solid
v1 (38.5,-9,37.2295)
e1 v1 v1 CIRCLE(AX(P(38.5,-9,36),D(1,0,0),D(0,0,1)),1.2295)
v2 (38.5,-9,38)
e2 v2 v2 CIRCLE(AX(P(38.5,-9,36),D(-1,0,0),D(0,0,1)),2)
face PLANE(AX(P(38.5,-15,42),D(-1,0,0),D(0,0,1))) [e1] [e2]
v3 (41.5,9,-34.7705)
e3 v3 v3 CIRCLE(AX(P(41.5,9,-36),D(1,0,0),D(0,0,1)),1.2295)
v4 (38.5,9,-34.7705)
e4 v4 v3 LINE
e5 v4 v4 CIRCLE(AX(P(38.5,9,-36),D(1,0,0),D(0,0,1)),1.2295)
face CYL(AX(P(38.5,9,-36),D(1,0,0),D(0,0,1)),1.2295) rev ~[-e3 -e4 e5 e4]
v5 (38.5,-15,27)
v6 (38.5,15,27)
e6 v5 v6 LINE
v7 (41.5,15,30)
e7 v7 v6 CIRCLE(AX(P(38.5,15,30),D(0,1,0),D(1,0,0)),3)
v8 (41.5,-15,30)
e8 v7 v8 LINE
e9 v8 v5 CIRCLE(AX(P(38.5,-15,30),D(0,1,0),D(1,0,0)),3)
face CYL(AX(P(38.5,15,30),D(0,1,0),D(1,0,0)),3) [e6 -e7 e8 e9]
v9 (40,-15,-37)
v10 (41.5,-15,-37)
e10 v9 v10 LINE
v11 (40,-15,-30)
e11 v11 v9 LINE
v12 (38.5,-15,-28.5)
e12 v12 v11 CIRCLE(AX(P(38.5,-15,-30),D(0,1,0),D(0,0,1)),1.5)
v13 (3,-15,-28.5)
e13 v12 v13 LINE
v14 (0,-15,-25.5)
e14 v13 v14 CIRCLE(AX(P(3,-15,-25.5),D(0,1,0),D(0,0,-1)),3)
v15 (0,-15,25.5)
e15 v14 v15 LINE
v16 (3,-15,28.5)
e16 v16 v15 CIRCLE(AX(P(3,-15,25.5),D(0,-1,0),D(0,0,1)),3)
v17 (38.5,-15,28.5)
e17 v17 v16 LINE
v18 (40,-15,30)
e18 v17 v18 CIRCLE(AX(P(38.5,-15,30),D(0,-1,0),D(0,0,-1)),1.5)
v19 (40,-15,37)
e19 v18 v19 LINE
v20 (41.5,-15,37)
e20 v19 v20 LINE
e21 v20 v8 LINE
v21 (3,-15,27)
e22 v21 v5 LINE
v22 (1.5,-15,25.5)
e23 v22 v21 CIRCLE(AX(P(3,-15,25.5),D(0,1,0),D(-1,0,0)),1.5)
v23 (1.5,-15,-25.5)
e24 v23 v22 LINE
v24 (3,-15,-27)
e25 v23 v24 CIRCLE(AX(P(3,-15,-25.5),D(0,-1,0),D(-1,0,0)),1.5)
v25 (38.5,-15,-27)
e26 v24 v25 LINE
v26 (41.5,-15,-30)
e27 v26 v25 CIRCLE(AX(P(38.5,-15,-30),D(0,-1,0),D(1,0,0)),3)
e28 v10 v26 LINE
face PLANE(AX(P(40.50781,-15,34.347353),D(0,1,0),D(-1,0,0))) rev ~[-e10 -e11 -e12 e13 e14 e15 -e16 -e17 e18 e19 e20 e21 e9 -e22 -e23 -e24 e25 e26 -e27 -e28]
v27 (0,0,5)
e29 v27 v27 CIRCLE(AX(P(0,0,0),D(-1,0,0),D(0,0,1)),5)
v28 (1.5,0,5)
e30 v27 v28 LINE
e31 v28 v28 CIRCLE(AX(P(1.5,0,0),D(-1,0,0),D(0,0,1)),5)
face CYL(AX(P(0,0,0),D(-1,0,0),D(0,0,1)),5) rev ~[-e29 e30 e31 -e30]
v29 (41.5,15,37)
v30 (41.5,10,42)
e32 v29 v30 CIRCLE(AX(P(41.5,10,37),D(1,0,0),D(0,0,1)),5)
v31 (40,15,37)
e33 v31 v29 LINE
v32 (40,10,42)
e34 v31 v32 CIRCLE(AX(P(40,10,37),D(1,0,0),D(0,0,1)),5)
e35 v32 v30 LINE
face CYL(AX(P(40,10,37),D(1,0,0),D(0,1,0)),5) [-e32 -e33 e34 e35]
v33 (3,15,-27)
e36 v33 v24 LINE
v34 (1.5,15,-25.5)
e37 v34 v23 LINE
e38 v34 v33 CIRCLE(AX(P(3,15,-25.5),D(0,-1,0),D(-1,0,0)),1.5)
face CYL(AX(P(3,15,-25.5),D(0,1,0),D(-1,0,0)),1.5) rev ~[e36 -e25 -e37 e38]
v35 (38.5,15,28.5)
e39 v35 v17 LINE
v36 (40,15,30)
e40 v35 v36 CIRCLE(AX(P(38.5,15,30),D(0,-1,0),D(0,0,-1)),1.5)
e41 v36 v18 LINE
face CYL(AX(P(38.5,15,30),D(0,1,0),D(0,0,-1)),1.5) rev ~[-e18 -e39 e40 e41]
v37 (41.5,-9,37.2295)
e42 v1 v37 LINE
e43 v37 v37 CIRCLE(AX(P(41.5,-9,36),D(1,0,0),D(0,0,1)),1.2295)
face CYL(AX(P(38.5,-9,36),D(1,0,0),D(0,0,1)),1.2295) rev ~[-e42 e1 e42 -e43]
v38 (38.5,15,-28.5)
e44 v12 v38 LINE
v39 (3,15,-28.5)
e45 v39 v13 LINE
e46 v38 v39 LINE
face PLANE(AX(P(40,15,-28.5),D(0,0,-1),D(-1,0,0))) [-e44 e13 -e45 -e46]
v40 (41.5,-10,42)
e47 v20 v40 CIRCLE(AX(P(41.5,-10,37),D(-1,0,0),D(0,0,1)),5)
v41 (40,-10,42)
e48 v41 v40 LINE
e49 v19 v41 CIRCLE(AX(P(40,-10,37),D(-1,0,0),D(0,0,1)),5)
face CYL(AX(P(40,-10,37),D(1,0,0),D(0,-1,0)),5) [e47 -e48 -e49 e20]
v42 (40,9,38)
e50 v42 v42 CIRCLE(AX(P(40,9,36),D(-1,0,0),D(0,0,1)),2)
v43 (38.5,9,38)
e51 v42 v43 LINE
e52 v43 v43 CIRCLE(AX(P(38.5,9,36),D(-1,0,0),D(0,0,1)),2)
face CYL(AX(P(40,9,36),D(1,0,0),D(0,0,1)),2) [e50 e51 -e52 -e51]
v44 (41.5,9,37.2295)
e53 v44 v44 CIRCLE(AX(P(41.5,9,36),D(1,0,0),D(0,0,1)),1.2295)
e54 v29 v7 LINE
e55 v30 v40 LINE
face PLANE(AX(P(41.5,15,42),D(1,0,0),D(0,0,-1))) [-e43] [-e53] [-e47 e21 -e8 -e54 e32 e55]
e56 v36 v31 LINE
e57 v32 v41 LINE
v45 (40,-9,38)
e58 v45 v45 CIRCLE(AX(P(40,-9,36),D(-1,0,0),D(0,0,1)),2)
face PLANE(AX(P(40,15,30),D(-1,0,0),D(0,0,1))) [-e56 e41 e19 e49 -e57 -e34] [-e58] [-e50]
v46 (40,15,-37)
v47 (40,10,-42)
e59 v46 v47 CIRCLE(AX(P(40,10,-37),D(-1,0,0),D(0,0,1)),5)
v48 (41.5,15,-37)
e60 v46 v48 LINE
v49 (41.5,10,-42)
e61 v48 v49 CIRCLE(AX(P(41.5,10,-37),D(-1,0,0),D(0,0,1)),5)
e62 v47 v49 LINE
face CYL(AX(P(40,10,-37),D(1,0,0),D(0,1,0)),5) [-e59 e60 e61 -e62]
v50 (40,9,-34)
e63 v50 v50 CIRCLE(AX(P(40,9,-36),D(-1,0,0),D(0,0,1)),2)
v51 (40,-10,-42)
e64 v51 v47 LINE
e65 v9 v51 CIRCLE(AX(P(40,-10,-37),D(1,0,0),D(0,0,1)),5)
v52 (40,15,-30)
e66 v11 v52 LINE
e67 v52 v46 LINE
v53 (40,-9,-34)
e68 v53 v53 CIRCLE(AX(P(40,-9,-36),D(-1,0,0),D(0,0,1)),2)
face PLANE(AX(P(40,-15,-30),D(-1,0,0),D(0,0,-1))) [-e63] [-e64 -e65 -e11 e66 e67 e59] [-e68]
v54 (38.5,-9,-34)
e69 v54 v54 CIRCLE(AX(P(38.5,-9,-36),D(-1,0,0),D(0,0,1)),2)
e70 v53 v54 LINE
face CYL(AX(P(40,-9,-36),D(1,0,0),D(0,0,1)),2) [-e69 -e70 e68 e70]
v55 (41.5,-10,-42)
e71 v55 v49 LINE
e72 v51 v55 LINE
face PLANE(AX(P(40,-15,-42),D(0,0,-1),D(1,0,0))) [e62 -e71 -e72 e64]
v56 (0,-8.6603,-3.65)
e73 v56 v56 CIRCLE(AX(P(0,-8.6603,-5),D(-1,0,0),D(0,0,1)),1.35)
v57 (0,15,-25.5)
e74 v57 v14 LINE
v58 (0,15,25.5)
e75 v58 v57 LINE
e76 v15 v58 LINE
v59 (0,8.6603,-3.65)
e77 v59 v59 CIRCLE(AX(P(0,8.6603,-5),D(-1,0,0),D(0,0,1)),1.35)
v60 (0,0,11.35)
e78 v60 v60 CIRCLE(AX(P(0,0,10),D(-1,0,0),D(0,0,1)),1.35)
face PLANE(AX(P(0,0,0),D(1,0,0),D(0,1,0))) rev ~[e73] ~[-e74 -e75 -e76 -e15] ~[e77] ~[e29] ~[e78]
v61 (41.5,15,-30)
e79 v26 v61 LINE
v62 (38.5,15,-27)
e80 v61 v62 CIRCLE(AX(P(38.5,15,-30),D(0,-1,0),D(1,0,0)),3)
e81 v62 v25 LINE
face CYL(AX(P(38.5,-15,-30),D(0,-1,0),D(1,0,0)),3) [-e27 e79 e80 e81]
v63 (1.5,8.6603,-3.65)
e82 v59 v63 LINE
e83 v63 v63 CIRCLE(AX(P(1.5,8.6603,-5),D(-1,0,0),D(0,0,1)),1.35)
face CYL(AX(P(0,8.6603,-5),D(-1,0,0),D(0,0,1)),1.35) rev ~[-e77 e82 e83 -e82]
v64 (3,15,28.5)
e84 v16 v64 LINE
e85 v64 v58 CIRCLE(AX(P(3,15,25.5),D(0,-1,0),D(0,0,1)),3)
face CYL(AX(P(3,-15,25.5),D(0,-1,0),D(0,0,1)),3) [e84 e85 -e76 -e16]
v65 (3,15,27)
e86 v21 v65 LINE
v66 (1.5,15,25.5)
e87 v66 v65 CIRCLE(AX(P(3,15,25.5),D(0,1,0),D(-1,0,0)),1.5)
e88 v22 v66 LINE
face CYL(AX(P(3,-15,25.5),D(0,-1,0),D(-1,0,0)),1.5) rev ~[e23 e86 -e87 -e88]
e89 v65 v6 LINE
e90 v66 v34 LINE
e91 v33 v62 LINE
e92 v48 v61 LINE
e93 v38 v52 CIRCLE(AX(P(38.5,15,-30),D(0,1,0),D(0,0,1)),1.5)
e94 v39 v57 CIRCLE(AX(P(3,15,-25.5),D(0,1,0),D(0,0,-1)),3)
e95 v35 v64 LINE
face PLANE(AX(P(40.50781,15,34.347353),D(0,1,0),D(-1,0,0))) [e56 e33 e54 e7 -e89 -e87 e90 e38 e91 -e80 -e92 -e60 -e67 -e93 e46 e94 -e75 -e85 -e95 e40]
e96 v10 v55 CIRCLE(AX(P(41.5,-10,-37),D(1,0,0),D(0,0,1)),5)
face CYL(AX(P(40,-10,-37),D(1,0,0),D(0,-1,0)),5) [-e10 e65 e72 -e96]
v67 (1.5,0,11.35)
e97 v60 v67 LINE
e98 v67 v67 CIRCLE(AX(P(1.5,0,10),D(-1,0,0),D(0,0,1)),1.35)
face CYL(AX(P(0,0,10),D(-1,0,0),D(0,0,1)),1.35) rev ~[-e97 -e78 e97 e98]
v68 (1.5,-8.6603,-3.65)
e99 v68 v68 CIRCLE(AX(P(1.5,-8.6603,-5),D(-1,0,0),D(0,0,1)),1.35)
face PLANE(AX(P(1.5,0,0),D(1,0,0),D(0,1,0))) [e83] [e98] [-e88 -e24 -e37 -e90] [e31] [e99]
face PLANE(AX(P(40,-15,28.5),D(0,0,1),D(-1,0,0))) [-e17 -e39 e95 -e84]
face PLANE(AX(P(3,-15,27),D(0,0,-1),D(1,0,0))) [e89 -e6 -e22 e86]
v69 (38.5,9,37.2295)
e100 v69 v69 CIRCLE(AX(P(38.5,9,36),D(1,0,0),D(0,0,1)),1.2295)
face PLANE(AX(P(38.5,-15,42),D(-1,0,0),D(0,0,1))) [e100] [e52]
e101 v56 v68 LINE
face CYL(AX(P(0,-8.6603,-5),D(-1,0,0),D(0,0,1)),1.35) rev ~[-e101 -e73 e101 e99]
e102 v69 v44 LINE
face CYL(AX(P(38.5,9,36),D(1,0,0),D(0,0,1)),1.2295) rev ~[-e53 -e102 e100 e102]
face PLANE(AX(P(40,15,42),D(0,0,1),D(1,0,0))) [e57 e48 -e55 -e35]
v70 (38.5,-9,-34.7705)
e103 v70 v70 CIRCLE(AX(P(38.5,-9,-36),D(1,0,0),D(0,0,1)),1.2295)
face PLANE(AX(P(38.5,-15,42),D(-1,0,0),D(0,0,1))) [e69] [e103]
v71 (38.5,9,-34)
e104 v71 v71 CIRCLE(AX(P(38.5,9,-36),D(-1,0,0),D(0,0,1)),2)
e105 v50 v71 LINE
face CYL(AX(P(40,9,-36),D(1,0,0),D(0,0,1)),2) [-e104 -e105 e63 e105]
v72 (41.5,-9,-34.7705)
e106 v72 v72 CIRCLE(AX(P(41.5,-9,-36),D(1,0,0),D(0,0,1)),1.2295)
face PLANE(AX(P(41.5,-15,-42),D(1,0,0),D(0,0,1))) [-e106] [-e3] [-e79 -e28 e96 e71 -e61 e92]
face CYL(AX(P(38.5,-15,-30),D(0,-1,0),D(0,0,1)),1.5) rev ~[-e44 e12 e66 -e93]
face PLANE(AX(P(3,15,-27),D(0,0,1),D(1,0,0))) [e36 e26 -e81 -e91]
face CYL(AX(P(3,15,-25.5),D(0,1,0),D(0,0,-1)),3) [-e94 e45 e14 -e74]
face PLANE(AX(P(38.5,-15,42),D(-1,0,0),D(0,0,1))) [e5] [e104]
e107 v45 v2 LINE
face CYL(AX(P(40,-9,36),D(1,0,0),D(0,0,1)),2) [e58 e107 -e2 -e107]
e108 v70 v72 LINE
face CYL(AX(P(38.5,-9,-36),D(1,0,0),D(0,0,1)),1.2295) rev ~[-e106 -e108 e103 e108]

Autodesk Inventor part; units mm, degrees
ref_plane "YZ Plane" through (0, 0, 0) normal (1, 0, 0) x (0, 1, 0)
ref_plane "XZ Plane" through (0, 0, 0) normal (0, 1, 0) x (-1, 0, 0)
ref_plane "XY Plane" through (0, 0, 0) normal (0, 0, 1) x (1, 0, 0)
sketch "スケッチ1" plane through (0, 0, 0) normal (1, 0, 0) x (0, 1, 0)
  line L0 (-15, -27) -> (-15, 27)
  line L1 (-15, 27) -> (15, 27)
  line L2 (15, 27) -> (15, -27)
  line L3 (15, -27) -> (-15, -27)
  line L4 (-15, -27) -> (15, 27) construction
  line L5 (-15, 27) -> (15, -27) construction
  point P0 (0, 0)
  dimension "d0" = 30
  dimension "d1" = 54
extrude "プレート1" add sketch "スケッチ1" along normal blind 1.5
sketch "スケッチ2" plane through (1.5, -15, 27) normal (0, 0, 1) x (1, 0, 0)
  line L0 (0, 30) -> (0, 0)
  line L1 (0, 0) -> (38.5, 0)
  line L2 (38.5, 0) -> (38.5, 30)
  line L3 (38.5, 30) -> (0, 30)
edge flange "フランジ1" height 40 angle 90 thickness 1.5 bend radius 1.5 thickness toward (0, 0, 1) relief tear relief width 1.5 relief depth 0.75 corner gap 1.5 corner form 0 edges at (1.5, 0, 27) (1.5, 0, -27) wall of the first edge with corners at (1.5, 15, 27) (1.5, -15, 27) (40, -15, 27) (40, 15, 27)
bend "曲げ1"
corner "コーナー1"
sketch "スケッチ3" plane through (40, 15, 28.5) normal (1, 0, 0) x (0, 1, 0)
  line L0 (-30, 0) -> (0, 0)
  line L1 (0, 0) -> (0, 13.5)
  line L2 (0, 13.5) -> (-30, 13.5)
  line L3 (-30, 13.5) -> (-30, 0)
edge flange "フランジ2" height 15 angle 90 thickness 1.5 bend radius 1.5 thickness toward (1, 0, 0) relief tear relief width 1.5 relief depth 0.75 corner gap 1.5 corner form 0 edges at (40, 0, 28.5) (40, 0, -28.5) wall of the first edge with corners at (40, -15, 28.5) (40, 15, 28.5) (40, 15, 42) (40, -15, 42)
bend "曲げ2"
corner "コーナー2"
sketch "スケッチ4" plane through (0, 0, 0) normal (-1, 0, 0) x (0, 0, 1)
  circle A0 centre (0, 0) radius 5
  circle A1 centre (10, 0) radius 1.35
  circle A2 centre (-5, 8.6603) radius 1.35
  circle A3 centre (-5, -8.6603) radius 1.35
  dimension "d23" = 10
  dimension "d24" = 2.7
  dimension "d25" = 0
  dimension "d26" = 10
  dimension "d29" = 360
extrude "押し出し1" cut sketch "スケッチ4" against normal blind 2
sketch "スケッチ6" plane through (40, -15, 42) normal (-1, 0, 0) x (0, 0, 1)
  circle A0 centre (-6, 24) radius 2
  line L0 (-12, 30) -> (0, 30) projected
  line L1 (0, 0) -> (0, 30) projected
  circle A1 centre (-6, 6) radius 2
  circle A2 centre (-78, 24) radius 2
  circle A3 centre (-78, 6) radius 2
  point P0 (-42, 15)
  dimension "d41" = 4
  dimension "d42" = 4
  dimension "d43" = 4
  dimension "d46" = 18
  dimension "d49" = 72
extrude "押し出し3" add sketch "スケッチ6" along normal blind 1.5
sketch "スケッチ7" plane through (38.5, 9, 36) normal (-1, 0, 0) x (0, 0, 1)
  circle A0 centre (0, 0) radius 2 projected
  circle A1 centre (0, -18) radius 2 projected
  circle A2 centre (-72, -18) radius 2 projected
  circle A3 centre (-72, 0) radius 2 projected
  circle A4 centre (0, 0) radius 2 projected
  circle A5 centre (0, -18) radius 2 projected
  circle A6 centre (-72, -18) radius 2 projected
  point P0 (-36, -9)
hole "穴1" at (38.5, 9, 36) at (38.5, -9, 36) at (38.5, 9, -36) at (38.5, -9, -36) direction (1, 0, 0) diameter 2.459 depth 3 thread size "M3x0.5" designation "M3" class "6H" standard "GB Metric profile"
fillet "フィレット1" radius 5 4 edges at (40.75, 15, 42) (40.75, -15, 42) (40.75, 15, -42) (40.75, -15, -42)
equation "\"d59\" = Thickness"
equation "\"BendRadius\" = Thickness"
equation "\"BendReliefWidth\" = Thickness"
equation "\"BendReliefDepth\" = 0.5 * Thickness"
equation "\"CornerReliefSize\" = 4 * Thickness"
equation "\"MinimumRemnant\" = 2 * Thickness"
equation "\"TransitionRadius\" = BendRadius"
equation "\"JacobiRadiusSize\" = BendRadius"
equation "\"GapSize\" = Thickness"
properties part number "hand_box2" material "アルミニウム 5052"
